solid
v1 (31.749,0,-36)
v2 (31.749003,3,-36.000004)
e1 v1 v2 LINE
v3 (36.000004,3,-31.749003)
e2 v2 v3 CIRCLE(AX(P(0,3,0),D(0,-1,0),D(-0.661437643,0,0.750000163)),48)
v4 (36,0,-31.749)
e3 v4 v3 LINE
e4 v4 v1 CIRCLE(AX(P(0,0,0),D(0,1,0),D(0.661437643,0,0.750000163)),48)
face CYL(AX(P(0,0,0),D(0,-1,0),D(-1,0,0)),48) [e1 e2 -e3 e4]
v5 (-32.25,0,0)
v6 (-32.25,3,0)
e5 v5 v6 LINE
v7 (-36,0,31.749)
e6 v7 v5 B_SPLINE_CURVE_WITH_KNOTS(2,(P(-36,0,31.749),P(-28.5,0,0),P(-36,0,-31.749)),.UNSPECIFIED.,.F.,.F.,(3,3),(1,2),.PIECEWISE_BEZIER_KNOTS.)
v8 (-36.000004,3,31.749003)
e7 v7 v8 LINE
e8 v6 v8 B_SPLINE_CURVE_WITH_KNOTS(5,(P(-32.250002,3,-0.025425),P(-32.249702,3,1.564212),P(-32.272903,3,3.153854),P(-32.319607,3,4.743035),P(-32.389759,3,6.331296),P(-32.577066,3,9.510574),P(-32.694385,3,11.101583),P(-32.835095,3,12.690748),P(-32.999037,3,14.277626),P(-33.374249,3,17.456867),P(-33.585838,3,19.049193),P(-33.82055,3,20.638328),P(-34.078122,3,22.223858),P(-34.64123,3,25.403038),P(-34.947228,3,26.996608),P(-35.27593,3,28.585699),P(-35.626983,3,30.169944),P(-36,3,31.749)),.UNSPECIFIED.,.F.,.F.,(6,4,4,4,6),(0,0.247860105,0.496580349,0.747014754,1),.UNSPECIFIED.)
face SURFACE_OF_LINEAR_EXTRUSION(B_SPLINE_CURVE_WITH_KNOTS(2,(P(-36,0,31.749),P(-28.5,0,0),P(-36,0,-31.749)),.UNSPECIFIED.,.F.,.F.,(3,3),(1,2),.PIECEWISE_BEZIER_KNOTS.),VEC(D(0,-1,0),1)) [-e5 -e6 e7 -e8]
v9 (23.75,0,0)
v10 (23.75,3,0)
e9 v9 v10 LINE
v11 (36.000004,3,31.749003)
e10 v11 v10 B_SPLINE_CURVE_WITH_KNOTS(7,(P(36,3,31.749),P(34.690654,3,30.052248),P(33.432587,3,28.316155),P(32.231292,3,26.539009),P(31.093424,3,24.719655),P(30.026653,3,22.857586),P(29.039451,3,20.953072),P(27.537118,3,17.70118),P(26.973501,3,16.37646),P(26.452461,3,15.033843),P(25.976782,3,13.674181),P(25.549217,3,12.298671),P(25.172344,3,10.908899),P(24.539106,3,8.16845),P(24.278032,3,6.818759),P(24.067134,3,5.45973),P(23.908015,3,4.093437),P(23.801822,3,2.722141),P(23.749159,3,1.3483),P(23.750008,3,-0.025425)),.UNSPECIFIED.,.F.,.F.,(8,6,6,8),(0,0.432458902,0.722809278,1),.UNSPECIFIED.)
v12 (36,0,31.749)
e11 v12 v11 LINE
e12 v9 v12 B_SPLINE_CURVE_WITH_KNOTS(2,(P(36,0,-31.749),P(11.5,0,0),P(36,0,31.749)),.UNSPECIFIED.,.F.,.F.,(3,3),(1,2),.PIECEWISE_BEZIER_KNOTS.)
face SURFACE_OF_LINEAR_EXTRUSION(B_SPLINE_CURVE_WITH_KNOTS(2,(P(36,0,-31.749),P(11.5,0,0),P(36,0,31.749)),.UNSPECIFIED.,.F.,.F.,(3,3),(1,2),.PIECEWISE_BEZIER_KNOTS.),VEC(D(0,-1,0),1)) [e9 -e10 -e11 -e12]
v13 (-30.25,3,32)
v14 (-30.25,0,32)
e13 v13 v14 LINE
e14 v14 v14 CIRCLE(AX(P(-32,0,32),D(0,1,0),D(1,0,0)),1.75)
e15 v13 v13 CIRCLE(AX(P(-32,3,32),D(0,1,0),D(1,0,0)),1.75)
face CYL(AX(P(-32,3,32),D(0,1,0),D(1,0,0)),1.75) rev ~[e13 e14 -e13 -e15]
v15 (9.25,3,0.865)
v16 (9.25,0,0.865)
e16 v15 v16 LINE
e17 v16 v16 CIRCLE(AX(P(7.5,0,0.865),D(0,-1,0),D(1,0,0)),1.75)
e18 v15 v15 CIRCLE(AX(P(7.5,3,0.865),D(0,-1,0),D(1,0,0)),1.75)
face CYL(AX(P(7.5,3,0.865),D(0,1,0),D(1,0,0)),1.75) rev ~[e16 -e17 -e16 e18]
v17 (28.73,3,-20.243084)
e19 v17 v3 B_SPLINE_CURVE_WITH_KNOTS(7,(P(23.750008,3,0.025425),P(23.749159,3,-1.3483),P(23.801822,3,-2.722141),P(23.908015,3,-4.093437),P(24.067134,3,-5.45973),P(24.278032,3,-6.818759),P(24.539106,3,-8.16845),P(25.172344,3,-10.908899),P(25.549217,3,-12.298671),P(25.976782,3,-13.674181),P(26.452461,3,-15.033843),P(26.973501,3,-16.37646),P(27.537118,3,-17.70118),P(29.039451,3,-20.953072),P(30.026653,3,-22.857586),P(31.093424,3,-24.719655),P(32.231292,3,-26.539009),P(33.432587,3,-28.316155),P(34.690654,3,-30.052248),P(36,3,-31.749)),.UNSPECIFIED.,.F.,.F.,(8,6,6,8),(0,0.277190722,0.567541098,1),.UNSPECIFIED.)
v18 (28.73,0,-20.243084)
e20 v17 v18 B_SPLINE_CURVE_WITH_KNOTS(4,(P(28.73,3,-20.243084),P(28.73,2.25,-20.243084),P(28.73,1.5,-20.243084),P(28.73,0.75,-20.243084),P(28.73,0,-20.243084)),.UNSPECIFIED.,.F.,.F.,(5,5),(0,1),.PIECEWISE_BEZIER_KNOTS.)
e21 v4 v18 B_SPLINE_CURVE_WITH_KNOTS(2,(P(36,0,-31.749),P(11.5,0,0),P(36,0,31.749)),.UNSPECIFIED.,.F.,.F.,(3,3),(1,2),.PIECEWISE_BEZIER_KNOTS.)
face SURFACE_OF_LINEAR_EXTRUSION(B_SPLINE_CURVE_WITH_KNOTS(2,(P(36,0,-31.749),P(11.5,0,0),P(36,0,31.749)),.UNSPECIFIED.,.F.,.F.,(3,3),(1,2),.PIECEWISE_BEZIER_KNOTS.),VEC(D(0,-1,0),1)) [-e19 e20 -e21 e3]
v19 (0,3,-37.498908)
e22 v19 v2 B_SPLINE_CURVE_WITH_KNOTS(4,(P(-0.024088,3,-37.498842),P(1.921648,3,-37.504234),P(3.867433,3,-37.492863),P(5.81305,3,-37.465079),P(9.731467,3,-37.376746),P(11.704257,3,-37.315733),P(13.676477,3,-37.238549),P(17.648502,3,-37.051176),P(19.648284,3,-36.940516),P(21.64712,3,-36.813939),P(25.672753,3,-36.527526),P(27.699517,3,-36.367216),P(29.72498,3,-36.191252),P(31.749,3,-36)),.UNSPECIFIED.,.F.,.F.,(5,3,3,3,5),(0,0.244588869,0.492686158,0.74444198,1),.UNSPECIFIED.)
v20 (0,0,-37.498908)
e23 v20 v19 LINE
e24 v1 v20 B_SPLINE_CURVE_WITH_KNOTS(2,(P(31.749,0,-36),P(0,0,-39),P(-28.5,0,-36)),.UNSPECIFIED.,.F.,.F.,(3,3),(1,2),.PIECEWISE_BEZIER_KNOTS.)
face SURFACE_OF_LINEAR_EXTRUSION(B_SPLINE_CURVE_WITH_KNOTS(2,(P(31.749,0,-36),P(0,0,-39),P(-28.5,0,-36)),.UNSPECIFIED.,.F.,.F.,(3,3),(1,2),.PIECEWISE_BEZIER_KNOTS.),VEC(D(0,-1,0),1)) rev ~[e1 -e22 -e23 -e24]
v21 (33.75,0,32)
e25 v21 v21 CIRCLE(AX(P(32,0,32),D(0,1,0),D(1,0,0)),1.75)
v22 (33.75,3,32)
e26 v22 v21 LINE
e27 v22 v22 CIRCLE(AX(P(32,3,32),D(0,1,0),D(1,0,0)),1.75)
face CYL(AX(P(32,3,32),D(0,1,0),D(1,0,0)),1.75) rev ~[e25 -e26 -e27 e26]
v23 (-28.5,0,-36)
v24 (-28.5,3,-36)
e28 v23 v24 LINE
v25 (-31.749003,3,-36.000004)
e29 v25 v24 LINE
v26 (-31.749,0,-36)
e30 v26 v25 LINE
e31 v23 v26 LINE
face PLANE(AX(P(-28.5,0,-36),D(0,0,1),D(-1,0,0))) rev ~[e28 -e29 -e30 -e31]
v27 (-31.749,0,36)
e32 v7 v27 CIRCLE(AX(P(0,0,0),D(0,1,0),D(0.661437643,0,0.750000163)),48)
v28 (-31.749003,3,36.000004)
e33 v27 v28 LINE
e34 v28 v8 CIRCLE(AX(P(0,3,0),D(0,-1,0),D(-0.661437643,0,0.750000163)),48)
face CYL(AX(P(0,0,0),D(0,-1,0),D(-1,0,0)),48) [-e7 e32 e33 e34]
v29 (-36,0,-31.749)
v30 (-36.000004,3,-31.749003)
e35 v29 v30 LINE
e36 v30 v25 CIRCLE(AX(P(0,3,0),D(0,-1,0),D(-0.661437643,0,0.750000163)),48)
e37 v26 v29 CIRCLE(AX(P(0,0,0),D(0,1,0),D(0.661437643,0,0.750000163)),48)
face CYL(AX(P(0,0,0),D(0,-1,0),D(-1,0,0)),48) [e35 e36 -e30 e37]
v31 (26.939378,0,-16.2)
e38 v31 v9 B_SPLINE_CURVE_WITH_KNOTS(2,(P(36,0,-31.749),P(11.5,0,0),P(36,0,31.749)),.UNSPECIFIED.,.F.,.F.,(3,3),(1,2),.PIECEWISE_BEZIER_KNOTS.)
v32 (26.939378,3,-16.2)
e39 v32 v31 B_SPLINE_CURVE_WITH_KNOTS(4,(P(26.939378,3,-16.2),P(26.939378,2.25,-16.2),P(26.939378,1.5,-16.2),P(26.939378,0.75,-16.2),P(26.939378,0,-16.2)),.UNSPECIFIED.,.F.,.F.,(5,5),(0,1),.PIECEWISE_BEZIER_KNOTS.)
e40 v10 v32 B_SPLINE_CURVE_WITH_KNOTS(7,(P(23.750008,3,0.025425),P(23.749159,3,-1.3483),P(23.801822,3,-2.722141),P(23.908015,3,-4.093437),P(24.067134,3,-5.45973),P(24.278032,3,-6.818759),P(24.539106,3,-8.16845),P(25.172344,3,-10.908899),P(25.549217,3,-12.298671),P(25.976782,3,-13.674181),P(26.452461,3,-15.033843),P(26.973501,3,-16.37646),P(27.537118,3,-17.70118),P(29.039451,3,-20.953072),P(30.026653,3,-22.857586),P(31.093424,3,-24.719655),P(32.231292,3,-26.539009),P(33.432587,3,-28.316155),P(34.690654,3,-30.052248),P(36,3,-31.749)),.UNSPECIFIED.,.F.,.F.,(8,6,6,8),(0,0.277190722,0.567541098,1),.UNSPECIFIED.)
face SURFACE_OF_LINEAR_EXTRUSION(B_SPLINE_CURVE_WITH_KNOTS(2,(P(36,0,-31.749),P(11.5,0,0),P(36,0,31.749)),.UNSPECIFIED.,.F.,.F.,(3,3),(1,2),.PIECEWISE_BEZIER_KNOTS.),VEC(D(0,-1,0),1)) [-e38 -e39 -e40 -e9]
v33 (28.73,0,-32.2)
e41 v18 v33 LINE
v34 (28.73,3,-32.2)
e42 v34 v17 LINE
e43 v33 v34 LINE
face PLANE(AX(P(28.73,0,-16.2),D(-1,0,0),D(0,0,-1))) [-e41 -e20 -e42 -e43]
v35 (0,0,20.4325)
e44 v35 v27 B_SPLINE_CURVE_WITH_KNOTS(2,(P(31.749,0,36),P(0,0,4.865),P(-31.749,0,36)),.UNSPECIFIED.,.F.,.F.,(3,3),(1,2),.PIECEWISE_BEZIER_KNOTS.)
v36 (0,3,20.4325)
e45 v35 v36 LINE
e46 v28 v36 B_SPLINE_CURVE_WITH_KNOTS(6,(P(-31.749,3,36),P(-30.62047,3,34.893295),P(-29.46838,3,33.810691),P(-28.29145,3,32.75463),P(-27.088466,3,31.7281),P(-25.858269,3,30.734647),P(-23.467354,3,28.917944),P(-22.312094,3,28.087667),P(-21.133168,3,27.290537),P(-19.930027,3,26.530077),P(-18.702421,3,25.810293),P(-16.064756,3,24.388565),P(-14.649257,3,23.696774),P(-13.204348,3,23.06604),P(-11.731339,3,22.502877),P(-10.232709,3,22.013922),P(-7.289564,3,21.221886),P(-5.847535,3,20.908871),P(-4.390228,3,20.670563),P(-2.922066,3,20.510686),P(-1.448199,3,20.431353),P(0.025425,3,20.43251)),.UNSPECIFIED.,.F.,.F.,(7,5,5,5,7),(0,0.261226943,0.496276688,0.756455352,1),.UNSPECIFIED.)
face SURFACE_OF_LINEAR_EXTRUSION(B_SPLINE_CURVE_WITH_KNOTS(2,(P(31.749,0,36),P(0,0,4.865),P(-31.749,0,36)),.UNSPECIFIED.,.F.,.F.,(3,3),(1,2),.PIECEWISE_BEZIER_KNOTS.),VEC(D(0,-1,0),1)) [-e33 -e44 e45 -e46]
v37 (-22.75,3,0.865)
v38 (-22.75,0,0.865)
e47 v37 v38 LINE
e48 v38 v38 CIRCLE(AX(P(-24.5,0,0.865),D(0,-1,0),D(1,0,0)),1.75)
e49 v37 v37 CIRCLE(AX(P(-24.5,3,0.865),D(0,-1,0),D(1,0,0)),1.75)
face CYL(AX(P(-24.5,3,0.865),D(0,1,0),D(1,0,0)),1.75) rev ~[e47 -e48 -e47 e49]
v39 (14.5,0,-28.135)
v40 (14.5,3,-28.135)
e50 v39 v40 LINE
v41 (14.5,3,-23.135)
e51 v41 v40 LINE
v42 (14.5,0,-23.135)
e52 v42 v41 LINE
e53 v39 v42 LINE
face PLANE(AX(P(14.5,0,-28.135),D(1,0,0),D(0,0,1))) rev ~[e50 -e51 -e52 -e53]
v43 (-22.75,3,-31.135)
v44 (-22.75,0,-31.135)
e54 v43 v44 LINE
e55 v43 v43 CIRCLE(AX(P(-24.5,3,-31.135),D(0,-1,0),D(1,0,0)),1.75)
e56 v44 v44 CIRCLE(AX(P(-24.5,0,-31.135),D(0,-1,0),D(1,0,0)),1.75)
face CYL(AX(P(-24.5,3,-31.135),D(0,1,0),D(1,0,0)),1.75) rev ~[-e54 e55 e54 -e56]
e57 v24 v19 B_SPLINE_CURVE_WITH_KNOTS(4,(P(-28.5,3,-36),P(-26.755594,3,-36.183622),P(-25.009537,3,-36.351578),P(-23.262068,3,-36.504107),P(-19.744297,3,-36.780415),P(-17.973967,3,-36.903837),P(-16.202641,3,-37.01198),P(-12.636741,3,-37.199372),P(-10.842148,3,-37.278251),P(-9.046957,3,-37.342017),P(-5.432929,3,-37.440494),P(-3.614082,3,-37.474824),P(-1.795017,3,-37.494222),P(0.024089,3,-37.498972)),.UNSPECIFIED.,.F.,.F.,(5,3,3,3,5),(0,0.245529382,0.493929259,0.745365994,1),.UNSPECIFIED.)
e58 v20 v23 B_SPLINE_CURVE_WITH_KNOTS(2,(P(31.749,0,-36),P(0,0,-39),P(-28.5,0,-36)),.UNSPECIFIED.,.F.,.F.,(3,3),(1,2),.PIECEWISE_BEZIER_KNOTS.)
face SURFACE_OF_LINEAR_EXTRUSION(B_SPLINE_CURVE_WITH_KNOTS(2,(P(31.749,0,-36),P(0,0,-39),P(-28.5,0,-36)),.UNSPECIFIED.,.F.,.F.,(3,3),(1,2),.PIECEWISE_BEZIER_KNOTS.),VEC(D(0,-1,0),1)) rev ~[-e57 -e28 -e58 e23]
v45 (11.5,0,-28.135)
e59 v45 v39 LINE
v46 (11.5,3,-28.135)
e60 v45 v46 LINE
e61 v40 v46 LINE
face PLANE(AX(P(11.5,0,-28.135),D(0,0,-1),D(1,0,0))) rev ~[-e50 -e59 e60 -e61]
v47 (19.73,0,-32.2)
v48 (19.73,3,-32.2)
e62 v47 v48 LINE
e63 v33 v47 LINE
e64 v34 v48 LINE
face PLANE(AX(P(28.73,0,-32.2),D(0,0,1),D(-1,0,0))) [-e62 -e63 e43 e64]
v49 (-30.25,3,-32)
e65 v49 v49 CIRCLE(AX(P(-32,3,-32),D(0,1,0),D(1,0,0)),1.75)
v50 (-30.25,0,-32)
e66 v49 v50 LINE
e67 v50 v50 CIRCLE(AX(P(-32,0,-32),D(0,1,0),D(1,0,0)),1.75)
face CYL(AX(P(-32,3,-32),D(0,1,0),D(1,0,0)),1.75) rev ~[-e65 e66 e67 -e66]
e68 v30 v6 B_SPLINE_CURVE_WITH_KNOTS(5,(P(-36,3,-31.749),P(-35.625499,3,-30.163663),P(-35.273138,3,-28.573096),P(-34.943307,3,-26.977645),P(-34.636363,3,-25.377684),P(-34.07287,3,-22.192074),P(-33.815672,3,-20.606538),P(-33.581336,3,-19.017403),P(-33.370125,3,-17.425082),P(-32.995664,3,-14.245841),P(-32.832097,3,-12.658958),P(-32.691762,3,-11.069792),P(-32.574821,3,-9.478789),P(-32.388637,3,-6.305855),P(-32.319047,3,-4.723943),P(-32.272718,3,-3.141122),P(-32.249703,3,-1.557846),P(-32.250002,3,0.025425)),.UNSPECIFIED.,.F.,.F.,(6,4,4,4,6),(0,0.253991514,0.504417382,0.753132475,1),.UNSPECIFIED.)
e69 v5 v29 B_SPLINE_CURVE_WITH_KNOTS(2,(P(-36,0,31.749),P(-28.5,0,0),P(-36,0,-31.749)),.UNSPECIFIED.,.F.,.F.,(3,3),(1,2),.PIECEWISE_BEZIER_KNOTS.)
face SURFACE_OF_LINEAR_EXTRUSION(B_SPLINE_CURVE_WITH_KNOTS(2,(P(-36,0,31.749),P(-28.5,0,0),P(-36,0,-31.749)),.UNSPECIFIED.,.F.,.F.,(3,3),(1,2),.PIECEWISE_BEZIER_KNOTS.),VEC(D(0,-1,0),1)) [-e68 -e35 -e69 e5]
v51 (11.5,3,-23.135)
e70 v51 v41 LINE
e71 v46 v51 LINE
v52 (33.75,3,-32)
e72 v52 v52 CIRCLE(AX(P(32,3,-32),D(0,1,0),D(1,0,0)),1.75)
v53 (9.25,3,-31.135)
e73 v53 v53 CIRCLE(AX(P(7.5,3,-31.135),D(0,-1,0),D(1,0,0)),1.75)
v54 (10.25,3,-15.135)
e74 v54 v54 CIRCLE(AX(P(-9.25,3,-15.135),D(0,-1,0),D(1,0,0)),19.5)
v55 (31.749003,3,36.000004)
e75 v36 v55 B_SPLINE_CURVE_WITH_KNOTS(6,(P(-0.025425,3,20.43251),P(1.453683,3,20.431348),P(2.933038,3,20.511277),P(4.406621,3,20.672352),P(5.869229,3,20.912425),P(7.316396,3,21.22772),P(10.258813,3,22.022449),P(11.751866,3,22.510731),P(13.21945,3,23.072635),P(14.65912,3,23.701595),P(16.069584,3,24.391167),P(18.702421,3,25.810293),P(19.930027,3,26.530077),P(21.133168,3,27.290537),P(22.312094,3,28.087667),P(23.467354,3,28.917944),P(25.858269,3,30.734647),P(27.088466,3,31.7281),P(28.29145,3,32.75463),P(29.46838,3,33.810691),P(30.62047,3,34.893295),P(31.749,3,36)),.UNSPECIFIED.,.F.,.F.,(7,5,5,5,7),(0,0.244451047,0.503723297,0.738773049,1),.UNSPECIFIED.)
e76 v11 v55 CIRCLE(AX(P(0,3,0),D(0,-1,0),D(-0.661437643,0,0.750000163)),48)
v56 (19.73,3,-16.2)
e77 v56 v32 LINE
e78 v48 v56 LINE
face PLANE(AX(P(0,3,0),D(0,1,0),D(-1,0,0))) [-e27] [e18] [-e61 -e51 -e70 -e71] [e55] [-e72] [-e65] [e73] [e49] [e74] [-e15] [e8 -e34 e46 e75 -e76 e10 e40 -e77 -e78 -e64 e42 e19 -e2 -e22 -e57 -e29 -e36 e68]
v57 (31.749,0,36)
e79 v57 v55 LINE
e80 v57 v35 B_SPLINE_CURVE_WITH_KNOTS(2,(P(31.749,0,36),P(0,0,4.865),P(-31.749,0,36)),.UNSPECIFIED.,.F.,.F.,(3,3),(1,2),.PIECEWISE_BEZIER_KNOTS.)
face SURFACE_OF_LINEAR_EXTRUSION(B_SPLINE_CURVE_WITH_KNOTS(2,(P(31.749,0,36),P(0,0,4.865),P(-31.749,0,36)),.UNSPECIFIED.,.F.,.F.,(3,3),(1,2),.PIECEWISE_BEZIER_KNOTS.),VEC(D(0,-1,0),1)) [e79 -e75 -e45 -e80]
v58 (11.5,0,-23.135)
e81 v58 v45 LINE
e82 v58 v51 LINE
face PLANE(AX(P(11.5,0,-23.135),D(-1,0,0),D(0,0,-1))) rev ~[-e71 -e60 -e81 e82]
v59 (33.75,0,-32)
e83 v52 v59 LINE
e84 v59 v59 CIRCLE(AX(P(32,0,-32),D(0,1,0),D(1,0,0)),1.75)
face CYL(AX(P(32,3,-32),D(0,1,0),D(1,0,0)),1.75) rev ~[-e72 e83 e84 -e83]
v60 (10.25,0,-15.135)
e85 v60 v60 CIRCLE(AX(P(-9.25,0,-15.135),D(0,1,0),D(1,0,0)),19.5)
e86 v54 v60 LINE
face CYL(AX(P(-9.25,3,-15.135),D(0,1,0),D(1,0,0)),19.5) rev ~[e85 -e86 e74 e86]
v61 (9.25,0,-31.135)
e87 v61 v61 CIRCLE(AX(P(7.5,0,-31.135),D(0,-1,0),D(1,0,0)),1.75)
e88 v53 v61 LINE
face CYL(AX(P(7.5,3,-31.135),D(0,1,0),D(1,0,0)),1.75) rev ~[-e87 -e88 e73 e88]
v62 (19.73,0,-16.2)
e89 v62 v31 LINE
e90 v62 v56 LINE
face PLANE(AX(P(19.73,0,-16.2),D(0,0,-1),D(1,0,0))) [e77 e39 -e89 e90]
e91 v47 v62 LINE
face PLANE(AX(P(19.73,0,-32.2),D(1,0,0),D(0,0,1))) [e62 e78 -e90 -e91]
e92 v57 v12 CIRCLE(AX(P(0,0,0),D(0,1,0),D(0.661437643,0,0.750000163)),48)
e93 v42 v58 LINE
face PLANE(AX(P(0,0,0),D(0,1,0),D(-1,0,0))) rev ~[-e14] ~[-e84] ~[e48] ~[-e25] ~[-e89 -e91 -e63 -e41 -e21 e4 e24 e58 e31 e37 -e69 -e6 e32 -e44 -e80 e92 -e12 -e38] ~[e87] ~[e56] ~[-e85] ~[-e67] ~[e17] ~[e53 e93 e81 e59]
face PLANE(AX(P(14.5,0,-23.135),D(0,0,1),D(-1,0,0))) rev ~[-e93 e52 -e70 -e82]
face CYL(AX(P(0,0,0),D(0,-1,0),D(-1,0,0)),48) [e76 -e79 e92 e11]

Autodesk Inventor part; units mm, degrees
ref_plane "YZ Plane" through (0, 0, 0) normal (1, 0, 0) x (0, 1, 0)
ref_plane "XZ Plane" through (0, 0, 0) normal (0, 1, 0) x (-1, 0, 0)
ref_plane "XY Plane" through (0, 0, 0) normal (0, 0, 1) x (1, 0, 0)
sketch "Sketch1" plane through (0, 0, 0) normal (0, 1, 0) x (-1, 0, 0)
  circle A0 centre (0, 0) radius 48
  dimension "d0" = 96
extrude "Extrusion1" add sketch "Sketch1" along normal blind 3
sketch "Sketch2" plane through (0, 3, 0) normal (0, 1, 0) x (1, 0, 0)
  circle A0 centre (-32, -32) radius 1.75
  line L0 (0, 0) -> (-48, 0)
  circle A1 centre (0, 0) radius 48 projected
  line L1 (0, 0) -> (0, -48)
  circle A2 centre (32, -32) radius 1.75
  circle A3 centre (32, 32) radius 1.75
  circle A4 centre (-32, 32) radius 1.75
  dimension "d3" = 3.5
  dimension "d4" = 32
  dimension "d5" = 32
  dimension "d8" = 360
extrude "Extrusion2" cut sketch "Sketch2" against normal blind 30 contours A0 | A2 | A3 | A4
sketch "Sketch3" plane through (0, 3, 0) normal (0, 1, 0) x (1, 0, 0)
  circle A0 centre (-32, 32) radius 1.75 projected
  line L0 (-30.25, 32) -> (-9.25, 32)
  circle A1 centre (0, 0) radius 48 projected
  line L1 (-9.25, 32) -> (-9.25, 15.135)
  line L2 (10.25, -4.365) -> (-28.75, 34.635) construction
  line L3 (-28.75, -4.365) -> (10.25, 34.635) construction
  circle A2 centre (-9.25, 15.135) radius 19.5
  dimension "d12" = 32
  dimension "d13" = 21
  dimension "d14" = 16.865
  dimension "d17" = 39
extrude "Extrusion3" cut sketch "Sketch3" against normal blind 5 contours A2
sketch "Sketch4" plane through (0, 0, 0) normal (0, -1, 0) x (1, 0, 0)
  line L0 (-29.25, 4.865) -> (10.75, 4.865)
  line L1 (10.75, 4.865) -> (10.75, -35.135)
  line L2 (10.75, -35.135) -> (-29.25, -35.135)
  line L3 (-29.25, -35.135) -> (-29.25, 4.865)
  circle A0 centre (-9.25, -15.135) radius 19.5 projected
  line L4 (-29.25, 4.865) -> (10.75, -35.135) construction
  line L5 (10.75, 4.865) -> (-29.25, -35.135) construction
  point P0 (0, 0)
  dimension "d20" = 40
  dimension "d21" = 40
ref_plane "Work Plane1" through (0, 3, 0) normal (0, -1, 0) x (1, 0, 0)
sketch "Sketch5" plane through (0, 3, 0) normal (0, -1, 0) x (1, 0, 0)
  circle A0 centre (7.5, -31.135) radius 1.75
  line L0 (11.5, -35.135) -> (-28.5, -35.135) projected
  line L1 (11.5, 4.865) -> (11.5, -35.135) projected
  circle A1 centre (-8.5, -15.135) radius 19.5 projected
  circle A2 centre (-8.5, -15.135) radius 19.5
  circle A3 centre (7.5, 0.865) radius 1.75
  circle A4 centre (-24.5, 0.865) radius 1.75
  circle A5 centre (-24.5, -31.135) radius 1.75
  point P0 (0, 0)
  dimension "d24" = 3.5
  dimension "d25" = 4
  dimension "d26" = 4
  dimension "d27" = 39
  dimension "d30" = 360
extrude "Extrusion5" cut sketch "Sketch5" along normal blind 3 contours A0 | A3 | A4 | A5
sketch "Sketch7" plane through (0, 0, 0) normal (0, -1, 0) x (1, 0, 0)
  line L0 (0, 0) -> (0, 36)
  line L1 (0, 36) -> (-31.749, 36)
  circle A0 centre (0, 0) radius 48 projected
  line L2 (0, 36) -> (31.749, 36)
  line L3 (-28.5, 4.865) -> (11.5, 4.865) projected
  line L4 (31.749, 36) -> (0, 4.865) construction
  line L5 (0, 4.865) -> (-31.749, 36) construction
  spline S0 degree 2 poles (31.749, 36) (0, 4.865) (-31.749, 36) knots 1 1 1 2 2 2
  dimension "d52" = 36
extrude "Extrusion7" cut sketch "Sketch7" against normal blind 5 contours S0 L1 L0 | L0 L2 S0 | L1 A0 L2
sketch "Sketch8" plane through (0, 0, 0) normal (0, -1, 0) x (1, 0, 0)
  line L0 (0, 0) -> (36, 0)
  line L1 (36, 0) -> (36, -31.749)
  arc A0 (-31.749, 36) -> (31.749, 36) centre (0, 0) ccw projected
  line L2 (36, 0) -> (36, 31.749)
  line L3 (11.5, 4.865) -> (11.5, -35.135) projected
  line L4 (36, -31.749) -> (11.5, 0) construction
  line L5 (11.5, 0) -> (36, 31.749) construction
  spline S0 degree 2 poles (36, -31.749) (11.5, 0) (36, 31.749) knots 1 1 1 2 2 2
  dimension "d55" = 36
extrude "Extrusion8" cut sketch "Sketch8" against normal blind 5
sketch "Sketch9" plane through (0, 0, 0) normal (0, -1, 0) x (1, 0, 0)
  line L0 (0, 0) -> (-36, 0)
  line L1 (-36, 0) -> (-36, 31.749)
  arc A0 (-31.749, 36) -> (36, -31.749) centre (0, 0) ccw projected
  line L2 (-36, 0) -> (-36, -31.749)
  line L3 (-28.5, -35.135) -> (-28.5, 4.865) projected
  line L4 (-36, 31.749) -> (-28.5, 0) construction
  line L5 (-28.5, 0) -> (-36, -31.749) construction
  spline S0 degree 2 poles (-36, 31.749) (-28.5, 0) (-36, -31.749) knots 1 1 1 2 2 2
  dimension "d58" = 36
extrude "Extrusion9" cut sketch "Sketch9" against normal blind 5
sketch "Sketch10" plane through (0, 0, 0) normal (0, -1, 0) x (1, 0, 0)
  line L0 (0, 0) -> (0, -36)
  line L1 (0, -36) -> (-31.749, -36)
  line L2 (0, -36) -> (31.749, -36)
  line L3 (11.5, 4.865) -> (11.5, -35.135) projected
  arc A0 (-36, -31.749) -> (36, -31.749) centre (0, 0) ccw projected
  line L4 (-28.5, -36) -> (-28.5, -38.6232)
  line L5 (-28.5, -35.135) -> (-28.5, 4.865) projected
  line L6 (0, -36) -> (0, -39)
  line L7 (31.749, -36) -> (0, -39) construction
  line L8 (0, -39) -> (-28.5, -36) construction
  spline S0 degree 2 poles (31.749, -36) (0, -39) (-28.5, -36) knots 1 1 1 2 2 2
  arc A1 (-31.749, -36) -> (31.749, -36) centre (0, 0) ccw
  dimension "d61" = 36
  dimension "d69" = 31.749
  dimension "d71" = 2.6232
  dimension "d72" = 3
sketch "Sketch11" plane through (0, 0, 0) normal (0, -1, 0) x (1, 0, 0)
  line L0 (11.5, 4.865) -> (11.5, -35.135) projected
  line L1 (11.5, -35.135) -> (11.5, -28.135)
  line L2 (11.5, -28.135) -> (14.5, -28.135)
  line L3 (14.5, -28.135) -> (14.5, -23.135)
  line L4 (14.5, -23.135) -> (11.5, -23.135)
  line L5 (11.5, -23.135) -> (11.5, -28.135)
  point P0 (0, 0)
  dimension "d64" = 7
  dimension "d65" = 3
  dimension "d66" = 5
extrude "Extrusion11" cut sketch "Sketch11" against normal blind 5
extrude "Extrusion12" cut sketch "Sketch10" against normal blind 5 contours L4 A0 L1 | S0 A0 L4
sketch "Sketch13" plane through (0, 0, 0) normal (0, -1, 0) x (1, 0, 0)
  circle A0 centre (32, -32) radius 1.75 projected
  line L0 (32, -32) -> (28.23, -32)
  line L1 (28.23, -32) -> (28.23, -24.2)
  line L2 (28.23, -24.2) -> (24.23, -24.2)
  line L3 (19.73, -16.2) -> (28.73, -16.2)
  line L4 (28.73, -16.2) -> (28.73, -32.2)
  line L5 (28.73, -32.2) -> (19.73, -32.2)
  line L6 (19.73, -32.2) -> (19.73, -16.2)
  line L7 (19.73, -16.2) -> (28.73, -32.2) construction
  line L8 (28.73, -16.2) -> (19.73, -32.2) construction
  point P0 (0, 0)
  dimension "d82" = 3.77
  dimension "d83" = 7.8
  dimension "d84" = 4
  dimension "d85" = 9
  dimension "d86" = 16
extrude "Extrusion14" cut sketch "Sketch13" against normal blind 3 contours L3 L4 L5 L6
properties part number "Fan_Mount"
